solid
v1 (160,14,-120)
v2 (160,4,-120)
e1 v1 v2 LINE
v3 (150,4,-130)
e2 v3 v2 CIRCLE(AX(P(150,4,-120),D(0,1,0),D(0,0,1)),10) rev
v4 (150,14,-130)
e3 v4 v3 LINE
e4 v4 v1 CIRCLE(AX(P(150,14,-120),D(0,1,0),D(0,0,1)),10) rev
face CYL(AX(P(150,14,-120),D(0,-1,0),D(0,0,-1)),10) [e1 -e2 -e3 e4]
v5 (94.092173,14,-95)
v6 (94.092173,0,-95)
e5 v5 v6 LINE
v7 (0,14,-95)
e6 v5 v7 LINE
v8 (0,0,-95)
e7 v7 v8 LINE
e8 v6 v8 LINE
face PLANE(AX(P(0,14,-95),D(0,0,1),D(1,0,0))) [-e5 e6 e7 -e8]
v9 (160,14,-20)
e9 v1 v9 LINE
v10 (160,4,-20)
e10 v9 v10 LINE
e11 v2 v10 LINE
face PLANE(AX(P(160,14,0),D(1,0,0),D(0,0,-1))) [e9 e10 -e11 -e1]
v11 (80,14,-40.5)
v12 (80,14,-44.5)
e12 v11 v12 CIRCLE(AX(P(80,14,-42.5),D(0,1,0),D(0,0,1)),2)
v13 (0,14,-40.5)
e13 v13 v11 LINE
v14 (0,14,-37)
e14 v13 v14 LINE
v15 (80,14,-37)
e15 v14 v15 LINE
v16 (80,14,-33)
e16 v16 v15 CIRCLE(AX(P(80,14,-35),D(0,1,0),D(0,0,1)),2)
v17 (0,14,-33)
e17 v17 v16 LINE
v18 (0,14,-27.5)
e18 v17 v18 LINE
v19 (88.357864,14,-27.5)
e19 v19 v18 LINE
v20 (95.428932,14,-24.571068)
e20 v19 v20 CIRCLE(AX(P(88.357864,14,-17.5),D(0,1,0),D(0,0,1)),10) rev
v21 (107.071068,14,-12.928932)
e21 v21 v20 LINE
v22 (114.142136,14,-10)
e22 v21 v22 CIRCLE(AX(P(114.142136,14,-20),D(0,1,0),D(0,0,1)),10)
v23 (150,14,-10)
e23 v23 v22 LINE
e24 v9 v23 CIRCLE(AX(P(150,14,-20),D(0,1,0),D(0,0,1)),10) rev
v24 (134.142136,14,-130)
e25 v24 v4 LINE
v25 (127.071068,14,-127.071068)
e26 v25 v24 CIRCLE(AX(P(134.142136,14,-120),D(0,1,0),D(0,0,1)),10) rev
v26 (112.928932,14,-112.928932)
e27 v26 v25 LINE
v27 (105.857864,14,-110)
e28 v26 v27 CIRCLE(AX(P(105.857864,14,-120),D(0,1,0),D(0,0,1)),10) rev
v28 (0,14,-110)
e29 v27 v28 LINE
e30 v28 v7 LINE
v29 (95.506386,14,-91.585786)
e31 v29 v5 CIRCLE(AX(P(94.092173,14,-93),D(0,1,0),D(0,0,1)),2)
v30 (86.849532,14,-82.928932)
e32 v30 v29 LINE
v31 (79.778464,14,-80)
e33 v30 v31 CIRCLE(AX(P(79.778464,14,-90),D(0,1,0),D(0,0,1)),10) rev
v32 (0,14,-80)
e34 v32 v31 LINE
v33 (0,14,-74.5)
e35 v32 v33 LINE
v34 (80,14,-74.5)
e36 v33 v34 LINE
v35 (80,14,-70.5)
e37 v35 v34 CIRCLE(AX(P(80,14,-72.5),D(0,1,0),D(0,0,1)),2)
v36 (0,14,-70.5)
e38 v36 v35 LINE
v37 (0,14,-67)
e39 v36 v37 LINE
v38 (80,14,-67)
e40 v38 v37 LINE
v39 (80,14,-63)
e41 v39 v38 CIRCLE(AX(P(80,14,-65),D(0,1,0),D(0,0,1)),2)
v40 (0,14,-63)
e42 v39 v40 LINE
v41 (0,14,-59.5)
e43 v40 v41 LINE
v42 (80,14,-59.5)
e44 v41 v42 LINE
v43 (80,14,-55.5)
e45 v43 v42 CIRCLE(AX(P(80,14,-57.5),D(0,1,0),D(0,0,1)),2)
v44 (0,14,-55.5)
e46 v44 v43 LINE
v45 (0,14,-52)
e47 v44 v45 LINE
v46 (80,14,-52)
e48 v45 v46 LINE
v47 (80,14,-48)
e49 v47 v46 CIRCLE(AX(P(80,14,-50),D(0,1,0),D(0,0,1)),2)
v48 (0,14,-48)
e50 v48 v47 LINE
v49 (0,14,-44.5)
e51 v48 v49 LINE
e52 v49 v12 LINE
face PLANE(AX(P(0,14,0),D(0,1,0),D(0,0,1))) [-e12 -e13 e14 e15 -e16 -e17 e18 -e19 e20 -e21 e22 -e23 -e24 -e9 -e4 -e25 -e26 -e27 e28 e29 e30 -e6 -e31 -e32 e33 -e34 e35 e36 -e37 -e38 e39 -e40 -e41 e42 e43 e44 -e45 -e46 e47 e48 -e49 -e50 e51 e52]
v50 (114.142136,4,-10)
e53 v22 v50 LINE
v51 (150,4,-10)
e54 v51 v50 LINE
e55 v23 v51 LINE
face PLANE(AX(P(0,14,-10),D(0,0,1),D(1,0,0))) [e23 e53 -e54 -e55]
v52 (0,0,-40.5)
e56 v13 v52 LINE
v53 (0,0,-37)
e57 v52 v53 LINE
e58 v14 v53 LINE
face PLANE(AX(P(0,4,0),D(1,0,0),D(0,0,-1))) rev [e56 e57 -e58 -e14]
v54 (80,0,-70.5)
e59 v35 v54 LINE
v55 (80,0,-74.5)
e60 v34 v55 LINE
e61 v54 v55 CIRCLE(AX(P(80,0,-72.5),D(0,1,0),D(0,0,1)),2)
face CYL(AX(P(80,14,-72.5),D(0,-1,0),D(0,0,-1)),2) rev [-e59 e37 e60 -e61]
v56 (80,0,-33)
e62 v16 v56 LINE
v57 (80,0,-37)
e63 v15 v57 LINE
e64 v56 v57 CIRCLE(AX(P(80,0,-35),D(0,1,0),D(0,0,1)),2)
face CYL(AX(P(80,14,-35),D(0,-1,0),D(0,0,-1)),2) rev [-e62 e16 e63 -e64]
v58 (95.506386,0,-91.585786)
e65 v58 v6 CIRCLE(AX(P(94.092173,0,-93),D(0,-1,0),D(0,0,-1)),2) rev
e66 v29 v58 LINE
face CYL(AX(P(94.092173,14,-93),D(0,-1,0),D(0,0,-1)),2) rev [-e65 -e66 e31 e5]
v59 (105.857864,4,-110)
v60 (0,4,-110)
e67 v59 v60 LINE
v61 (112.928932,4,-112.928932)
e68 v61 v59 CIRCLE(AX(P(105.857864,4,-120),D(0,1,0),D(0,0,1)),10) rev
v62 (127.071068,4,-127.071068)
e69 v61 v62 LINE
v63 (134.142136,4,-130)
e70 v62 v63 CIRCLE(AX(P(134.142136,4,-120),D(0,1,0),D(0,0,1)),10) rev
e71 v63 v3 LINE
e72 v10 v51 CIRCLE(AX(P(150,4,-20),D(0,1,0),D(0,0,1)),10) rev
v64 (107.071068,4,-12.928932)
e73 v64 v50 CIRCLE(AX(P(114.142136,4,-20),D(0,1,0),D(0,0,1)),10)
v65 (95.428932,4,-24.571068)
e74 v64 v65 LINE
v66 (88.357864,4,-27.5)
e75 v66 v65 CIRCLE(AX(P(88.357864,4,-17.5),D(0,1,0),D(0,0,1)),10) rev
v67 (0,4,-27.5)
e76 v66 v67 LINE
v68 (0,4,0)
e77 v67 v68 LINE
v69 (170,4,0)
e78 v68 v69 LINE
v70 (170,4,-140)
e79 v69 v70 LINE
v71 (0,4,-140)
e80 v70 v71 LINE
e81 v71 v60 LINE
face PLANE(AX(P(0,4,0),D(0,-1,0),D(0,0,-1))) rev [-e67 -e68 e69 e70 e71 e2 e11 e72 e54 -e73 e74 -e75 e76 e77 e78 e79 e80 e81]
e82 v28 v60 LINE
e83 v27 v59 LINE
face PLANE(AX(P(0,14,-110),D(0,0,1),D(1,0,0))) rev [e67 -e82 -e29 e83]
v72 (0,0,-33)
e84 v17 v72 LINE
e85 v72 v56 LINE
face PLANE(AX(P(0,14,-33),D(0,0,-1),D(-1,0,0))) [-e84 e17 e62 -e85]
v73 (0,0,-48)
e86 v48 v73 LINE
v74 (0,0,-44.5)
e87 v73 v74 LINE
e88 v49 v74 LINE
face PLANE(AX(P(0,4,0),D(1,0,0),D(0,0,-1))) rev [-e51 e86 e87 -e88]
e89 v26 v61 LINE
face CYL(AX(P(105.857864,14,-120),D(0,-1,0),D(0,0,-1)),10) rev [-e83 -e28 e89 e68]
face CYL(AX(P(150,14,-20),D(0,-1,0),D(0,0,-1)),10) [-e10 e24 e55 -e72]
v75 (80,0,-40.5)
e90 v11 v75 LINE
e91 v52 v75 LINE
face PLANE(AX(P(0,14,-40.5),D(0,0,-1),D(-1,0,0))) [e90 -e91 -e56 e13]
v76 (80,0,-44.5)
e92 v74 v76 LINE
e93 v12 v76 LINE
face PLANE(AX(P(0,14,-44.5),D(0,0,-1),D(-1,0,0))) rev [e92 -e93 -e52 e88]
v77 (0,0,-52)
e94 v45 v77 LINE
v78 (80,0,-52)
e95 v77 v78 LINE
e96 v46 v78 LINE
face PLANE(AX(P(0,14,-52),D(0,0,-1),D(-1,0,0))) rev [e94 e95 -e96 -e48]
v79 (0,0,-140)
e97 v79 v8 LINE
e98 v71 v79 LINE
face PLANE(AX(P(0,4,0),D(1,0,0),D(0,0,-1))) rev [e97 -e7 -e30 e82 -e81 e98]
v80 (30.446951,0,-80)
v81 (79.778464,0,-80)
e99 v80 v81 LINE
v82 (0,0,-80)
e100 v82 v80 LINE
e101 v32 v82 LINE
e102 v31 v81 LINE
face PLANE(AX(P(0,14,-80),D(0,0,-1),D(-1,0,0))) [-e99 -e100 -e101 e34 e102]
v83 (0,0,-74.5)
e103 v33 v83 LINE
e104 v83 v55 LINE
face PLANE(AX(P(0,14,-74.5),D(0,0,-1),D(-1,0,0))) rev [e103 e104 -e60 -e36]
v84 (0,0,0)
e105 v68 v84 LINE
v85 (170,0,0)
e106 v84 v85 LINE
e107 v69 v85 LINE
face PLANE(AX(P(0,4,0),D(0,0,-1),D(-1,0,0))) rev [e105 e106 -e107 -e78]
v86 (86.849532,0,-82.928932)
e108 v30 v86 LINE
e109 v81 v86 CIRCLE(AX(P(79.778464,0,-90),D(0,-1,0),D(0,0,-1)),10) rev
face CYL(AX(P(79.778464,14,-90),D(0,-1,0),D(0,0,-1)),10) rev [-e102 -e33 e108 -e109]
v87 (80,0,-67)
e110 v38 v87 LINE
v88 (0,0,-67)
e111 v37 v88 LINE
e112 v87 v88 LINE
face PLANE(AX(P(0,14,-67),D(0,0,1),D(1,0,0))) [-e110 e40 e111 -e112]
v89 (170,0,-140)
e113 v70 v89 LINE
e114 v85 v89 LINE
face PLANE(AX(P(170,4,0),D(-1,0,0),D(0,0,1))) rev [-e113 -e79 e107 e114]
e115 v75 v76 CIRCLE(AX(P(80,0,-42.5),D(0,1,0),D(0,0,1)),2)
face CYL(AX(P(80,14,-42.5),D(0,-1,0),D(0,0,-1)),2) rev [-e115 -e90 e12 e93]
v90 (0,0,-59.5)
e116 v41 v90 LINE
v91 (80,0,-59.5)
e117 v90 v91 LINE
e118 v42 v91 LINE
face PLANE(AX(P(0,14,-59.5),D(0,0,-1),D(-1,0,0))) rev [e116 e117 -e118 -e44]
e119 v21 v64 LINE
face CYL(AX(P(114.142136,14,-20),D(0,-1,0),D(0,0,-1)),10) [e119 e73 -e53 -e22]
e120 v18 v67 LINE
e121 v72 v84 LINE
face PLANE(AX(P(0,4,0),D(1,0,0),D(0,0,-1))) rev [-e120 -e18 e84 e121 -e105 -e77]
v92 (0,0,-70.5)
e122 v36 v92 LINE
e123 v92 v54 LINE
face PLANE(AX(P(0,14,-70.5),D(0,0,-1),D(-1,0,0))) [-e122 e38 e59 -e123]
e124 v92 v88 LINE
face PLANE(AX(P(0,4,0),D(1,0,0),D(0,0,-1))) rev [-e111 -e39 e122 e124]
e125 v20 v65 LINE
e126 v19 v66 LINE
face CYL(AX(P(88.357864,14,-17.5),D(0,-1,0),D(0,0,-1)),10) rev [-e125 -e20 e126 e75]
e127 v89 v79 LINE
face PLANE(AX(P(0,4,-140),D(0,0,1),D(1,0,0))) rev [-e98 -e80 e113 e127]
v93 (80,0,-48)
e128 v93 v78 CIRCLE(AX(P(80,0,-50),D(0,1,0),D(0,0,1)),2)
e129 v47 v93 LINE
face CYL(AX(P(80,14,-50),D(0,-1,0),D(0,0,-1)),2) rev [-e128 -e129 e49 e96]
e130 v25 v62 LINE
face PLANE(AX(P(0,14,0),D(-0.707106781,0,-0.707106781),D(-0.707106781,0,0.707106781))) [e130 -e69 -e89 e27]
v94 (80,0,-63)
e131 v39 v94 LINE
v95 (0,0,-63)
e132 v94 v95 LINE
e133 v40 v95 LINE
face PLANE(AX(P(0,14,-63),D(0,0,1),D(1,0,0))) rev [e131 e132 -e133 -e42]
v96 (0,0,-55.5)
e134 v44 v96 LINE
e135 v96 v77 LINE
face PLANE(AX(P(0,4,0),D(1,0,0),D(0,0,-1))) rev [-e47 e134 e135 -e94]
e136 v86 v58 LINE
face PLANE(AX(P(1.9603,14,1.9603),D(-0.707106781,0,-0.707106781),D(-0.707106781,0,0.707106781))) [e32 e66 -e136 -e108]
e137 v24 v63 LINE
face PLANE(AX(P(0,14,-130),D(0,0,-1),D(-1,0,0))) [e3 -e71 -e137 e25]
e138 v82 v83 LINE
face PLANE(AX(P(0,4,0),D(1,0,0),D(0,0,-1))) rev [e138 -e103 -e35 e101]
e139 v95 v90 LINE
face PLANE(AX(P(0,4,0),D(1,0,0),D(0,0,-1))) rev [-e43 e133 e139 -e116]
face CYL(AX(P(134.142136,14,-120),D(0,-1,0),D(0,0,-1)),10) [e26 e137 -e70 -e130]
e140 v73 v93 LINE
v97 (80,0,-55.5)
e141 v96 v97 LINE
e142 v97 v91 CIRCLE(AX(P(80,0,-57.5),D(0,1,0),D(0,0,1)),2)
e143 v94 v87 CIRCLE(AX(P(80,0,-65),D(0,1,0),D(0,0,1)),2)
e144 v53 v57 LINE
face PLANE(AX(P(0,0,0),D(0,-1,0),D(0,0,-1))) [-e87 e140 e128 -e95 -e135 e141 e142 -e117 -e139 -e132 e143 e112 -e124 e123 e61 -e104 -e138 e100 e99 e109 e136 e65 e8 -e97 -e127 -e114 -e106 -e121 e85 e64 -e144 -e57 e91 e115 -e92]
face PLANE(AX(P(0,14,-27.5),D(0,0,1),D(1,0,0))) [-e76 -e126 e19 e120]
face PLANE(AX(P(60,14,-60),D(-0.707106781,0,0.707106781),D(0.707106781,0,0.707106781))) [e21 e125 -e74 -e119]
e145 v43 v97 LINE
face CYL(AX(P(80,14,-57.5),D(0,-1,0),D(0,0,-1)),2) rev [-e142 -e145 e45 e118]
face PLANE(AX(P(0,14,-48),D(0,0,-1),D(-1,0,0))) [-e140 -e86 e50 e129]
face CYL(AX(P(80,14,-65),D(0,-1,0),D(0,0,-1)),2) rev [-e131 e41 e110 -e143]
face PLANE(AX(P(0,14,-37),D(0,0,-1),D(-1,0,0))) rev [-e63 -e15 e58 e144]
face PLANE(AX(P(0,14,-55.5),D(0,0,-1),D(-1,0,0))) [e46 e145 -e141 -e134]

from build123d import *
from build123d.topology import SkipClean

# Parameters (mm, degrees)
SKETCH1_W               = 170
SKETCH1_H               = 140
BOSS_EXTRUDE1_DEPTH     = 4
BOSS_EXTRUDE2_DEPTH     = 10
CUT_EXTRUDE3_DEPTH      = 221.671701856
CUT_EXTRUDE3_DEPTH_BACK = 221.671701856
CUT_EXTRUDE6_DEPTH      = 10


with BuildPart() as part:
    # Sketch1 → Boss-Extrude1 (new body)
    with BuildSketch(Plane(origin=(0, 0, 0), x_dir=(1, 0, 0), z_dir=(0, 1, 0))):
        with Locations((85, 70)):
            Rectangle(SKETCH1_W, SKETCH1_H)
    extrude(amount=BOSS_EXTRUDE1_DEPTH)

    # Sketch2 → Boss-Extrude2 (add)
    with BuildSketch(Plane(origin=(0, 4, 0), x_dir=(1, 0, 0), z_dir=(0, 1, 0))):
        with BuildLine():
            Line((127.071067812, 127.071067812), (112.928932188, 112.928932188))
            ThreePointArc((112.928932188, 112.928932188), (109.6846987, 110.761204675), (105.857864376, 110))
            Line((105.857864376, 110), (0, 110))
            Line((0, 110), (0, 95))
            Line((0, 95), (94.092172608, 95))
            ThreePointArc((94.092172608, 95), (95.939931673, 93.765366865), (95.50638617, 91.585786438))
            Line((95.50638617, 91.585786438), (86.849531921, 82.928932188))
            ThreePointArc((86.849531921, 82.928932188), (83.605298432, 80.761204675), (79.778464109, 80))
            Line((79.778464109, 80), (30.446951372, 80))
            Line((30.446951372, 80), (0, 80))
            Line((0, 80), (0, 74.5))
            Line((0, 74.5), (80, 74.5))
            ThreePointArc((80, 74.5), (82, 72.5), (80, 70.5))
            Line((80, 70.5), (0, 70.5))
            Line((0, 70.5), (0, 67))
            Line((0, 67), (80, 67))
            ThreePointArc((80, 67), (82, 65), (80, 63))
            Line((80, 63), (0, 63))
            Line((0, 63), (0, 59.5))
            Line((0, 59.5), (80, 59.5))
            ThreePointArc((80, 59.5), (82, 57.5), (80, 55.5))
            Line((80, 55.5), (0, 55.5))
            Line((0, 55.5), (0, 52))
            Line((0, 52), (80, 52))
            ThreePointArc((80, 52), (82, 50), (80, 48))
            Line((80, 48), (0, 48))
            Line((0, 48), (0, 44.5))
            Line((0, 44.5), (80, 44.5))
            ThreePointArc((80, 44.5), (82, 42.5), (80, 40.5))
            Line((80, 40.5), (0, 40.5))
            Line((0, 40.5), (0, 37))
            Line((0, 37), (80, 37))
            ThreePointArc((80, 37), (82, 35), (80, 33))
            Line((80, 33), (0, 33))
            Line((0, 33), (0, 27.5))
            Line((0, 27.5), (88.357864376, 27.5))
            ThreePointArc((88.357864376, 27.5), (92.1846987, 26.738795325), (95.428932188, 24.571067812))
            Line((95.428932188, 24.571067812), (107.071067812, 12.928932188))
            ThreePointArc((107.071067812, 12.928932188), (110.3153013, 10.761204675), (114.142135624, 10))
            Line((114.142135624, 10), (150, 10))
            ThreePointArc((150, 10), (157.071067812, 12.928932188), (160, 20))
            Line((160, 20), (160, 120))
            ThreePointArc((160, 120), (157.071067812, 127.071067812), (150, 130))
            Line((150, 130), (134.142135624, 130))
            ThreePointArc((134.142135624, 130), (130.3153013, 129.238795325), (127.071067812, 127.071067812))
        make_face()
    extrude(amount=BOSS_EXTRUDE2_DEPTH)

    # Sketch4 → Cut-Extrude3 (cut, two sides: drawn at the far end of the back side and taken through both)
    with SkipClean():  # the faces are left unmerged after this step: merging them gives an invalid solid
        with BuildSketch(Plane(origin=(0, 0, 0), x_dir=(1, 0, 0), z_dir=(0, 1, 0)).offset(-CUT_EXTRUDE3_DEPTH_BACK)):
            with BuildLine():
                Line((94.092172608, 95), (0, 95))
                Line((0, 95), (0, 80))
                Line((0, 80), (30.446951372, 80))
                Line((30.446951372, 80), (79.778464109, 80))
                ThreePointArc((79.778464109, 80), (83.605298432, 80.761204675), (86.849531921, 82.928932188))
                Line((86.849531921, 82.928932188), (95.50638617, 91.585786438))
                ThreePointArc((95.50638617, 91.585786438), (95.939931673, 93.765366865), (94.092172608, 95))
            make_face()
        extrude(amount=CUT_EXTRUDE3_DEPTH + CUT_EXTRUDE3_DEPTH_BACK, mode=Mode.SUBTRACT)
    add(part.part.scale(1), mode=Mode.REPLACE)  # the faces are merged on a copy

    # Sketch5 → Cut-Extrude6 (cut)
    with BuildSketch(Plane(origin=(0, 0, 0), x_dir=(1, 0, 0), z_dir=(0, 1, 0))):
        with BuildLine():
            Line((-80, 70.5), (80, 70.5))
            ThreePointArc((80, 70.5), (82, 72.5), (80, 74.5))
            Line((80, 74.5), (-80, 74.5))
            ThreePointArc((-80, 74.5), (-82, 72.5), (-80, 70.5))
        make_face()
        with BuildLine():
            Line((80, 63), (-80, 63))
            ThreePointArc((-80, 63), (-82, 65), (-80, 67))
            Line((-80, 67), (80, 67))
            ThreePointArc((80, 67), (82, 65), (80, 63))
        make_face()
        with BuildLine():
            Line((-80, 55.5), (80, 55.5))
            ThreePointArc((80, 55.5), (82, 57.5), (80, 59.5))
            Line((80, 59.5), (-80, 59.5))
            ThreePointArc((-80, 59.5), (-82, 57.5), (-80, 55.5))
        make_face()
        with BuildLine():
            Line((-80, 48), (80, 48))
            ThreePointArc((80, 48), (82, 50), (80, 52))
            Line((80, 52), (-80, 52))
            ThreePointArc((-80, 52), (-82, 50), (-80, 48))
        make_face()
        with BuildLine():
            Line((-80, 40.5), (80, 40.5))
            ThreePointArc((80, 40.5), (82, 42.5), (80, 44.5))
            Line((80, 44.5), (-80, 44.5))
            ThreePointArc((-80, 44.5), (-82, 42.5), (-80, 40.5))
        make_face()
        with BuildLine():
            Line((-80, 33), (80, 33))
            ThreePointArc((80, 33), (82, 35), (80, 37))
            Line((80, 37), (-80, 37))
            ThreePointArc((-80, 37), (-82, 35), (-80, 33))
        make_face()
    extrude(amount=CUT_EXTRUDE6_DEPTH, mode=Mode.SUBTRACT)


solid = part.part
